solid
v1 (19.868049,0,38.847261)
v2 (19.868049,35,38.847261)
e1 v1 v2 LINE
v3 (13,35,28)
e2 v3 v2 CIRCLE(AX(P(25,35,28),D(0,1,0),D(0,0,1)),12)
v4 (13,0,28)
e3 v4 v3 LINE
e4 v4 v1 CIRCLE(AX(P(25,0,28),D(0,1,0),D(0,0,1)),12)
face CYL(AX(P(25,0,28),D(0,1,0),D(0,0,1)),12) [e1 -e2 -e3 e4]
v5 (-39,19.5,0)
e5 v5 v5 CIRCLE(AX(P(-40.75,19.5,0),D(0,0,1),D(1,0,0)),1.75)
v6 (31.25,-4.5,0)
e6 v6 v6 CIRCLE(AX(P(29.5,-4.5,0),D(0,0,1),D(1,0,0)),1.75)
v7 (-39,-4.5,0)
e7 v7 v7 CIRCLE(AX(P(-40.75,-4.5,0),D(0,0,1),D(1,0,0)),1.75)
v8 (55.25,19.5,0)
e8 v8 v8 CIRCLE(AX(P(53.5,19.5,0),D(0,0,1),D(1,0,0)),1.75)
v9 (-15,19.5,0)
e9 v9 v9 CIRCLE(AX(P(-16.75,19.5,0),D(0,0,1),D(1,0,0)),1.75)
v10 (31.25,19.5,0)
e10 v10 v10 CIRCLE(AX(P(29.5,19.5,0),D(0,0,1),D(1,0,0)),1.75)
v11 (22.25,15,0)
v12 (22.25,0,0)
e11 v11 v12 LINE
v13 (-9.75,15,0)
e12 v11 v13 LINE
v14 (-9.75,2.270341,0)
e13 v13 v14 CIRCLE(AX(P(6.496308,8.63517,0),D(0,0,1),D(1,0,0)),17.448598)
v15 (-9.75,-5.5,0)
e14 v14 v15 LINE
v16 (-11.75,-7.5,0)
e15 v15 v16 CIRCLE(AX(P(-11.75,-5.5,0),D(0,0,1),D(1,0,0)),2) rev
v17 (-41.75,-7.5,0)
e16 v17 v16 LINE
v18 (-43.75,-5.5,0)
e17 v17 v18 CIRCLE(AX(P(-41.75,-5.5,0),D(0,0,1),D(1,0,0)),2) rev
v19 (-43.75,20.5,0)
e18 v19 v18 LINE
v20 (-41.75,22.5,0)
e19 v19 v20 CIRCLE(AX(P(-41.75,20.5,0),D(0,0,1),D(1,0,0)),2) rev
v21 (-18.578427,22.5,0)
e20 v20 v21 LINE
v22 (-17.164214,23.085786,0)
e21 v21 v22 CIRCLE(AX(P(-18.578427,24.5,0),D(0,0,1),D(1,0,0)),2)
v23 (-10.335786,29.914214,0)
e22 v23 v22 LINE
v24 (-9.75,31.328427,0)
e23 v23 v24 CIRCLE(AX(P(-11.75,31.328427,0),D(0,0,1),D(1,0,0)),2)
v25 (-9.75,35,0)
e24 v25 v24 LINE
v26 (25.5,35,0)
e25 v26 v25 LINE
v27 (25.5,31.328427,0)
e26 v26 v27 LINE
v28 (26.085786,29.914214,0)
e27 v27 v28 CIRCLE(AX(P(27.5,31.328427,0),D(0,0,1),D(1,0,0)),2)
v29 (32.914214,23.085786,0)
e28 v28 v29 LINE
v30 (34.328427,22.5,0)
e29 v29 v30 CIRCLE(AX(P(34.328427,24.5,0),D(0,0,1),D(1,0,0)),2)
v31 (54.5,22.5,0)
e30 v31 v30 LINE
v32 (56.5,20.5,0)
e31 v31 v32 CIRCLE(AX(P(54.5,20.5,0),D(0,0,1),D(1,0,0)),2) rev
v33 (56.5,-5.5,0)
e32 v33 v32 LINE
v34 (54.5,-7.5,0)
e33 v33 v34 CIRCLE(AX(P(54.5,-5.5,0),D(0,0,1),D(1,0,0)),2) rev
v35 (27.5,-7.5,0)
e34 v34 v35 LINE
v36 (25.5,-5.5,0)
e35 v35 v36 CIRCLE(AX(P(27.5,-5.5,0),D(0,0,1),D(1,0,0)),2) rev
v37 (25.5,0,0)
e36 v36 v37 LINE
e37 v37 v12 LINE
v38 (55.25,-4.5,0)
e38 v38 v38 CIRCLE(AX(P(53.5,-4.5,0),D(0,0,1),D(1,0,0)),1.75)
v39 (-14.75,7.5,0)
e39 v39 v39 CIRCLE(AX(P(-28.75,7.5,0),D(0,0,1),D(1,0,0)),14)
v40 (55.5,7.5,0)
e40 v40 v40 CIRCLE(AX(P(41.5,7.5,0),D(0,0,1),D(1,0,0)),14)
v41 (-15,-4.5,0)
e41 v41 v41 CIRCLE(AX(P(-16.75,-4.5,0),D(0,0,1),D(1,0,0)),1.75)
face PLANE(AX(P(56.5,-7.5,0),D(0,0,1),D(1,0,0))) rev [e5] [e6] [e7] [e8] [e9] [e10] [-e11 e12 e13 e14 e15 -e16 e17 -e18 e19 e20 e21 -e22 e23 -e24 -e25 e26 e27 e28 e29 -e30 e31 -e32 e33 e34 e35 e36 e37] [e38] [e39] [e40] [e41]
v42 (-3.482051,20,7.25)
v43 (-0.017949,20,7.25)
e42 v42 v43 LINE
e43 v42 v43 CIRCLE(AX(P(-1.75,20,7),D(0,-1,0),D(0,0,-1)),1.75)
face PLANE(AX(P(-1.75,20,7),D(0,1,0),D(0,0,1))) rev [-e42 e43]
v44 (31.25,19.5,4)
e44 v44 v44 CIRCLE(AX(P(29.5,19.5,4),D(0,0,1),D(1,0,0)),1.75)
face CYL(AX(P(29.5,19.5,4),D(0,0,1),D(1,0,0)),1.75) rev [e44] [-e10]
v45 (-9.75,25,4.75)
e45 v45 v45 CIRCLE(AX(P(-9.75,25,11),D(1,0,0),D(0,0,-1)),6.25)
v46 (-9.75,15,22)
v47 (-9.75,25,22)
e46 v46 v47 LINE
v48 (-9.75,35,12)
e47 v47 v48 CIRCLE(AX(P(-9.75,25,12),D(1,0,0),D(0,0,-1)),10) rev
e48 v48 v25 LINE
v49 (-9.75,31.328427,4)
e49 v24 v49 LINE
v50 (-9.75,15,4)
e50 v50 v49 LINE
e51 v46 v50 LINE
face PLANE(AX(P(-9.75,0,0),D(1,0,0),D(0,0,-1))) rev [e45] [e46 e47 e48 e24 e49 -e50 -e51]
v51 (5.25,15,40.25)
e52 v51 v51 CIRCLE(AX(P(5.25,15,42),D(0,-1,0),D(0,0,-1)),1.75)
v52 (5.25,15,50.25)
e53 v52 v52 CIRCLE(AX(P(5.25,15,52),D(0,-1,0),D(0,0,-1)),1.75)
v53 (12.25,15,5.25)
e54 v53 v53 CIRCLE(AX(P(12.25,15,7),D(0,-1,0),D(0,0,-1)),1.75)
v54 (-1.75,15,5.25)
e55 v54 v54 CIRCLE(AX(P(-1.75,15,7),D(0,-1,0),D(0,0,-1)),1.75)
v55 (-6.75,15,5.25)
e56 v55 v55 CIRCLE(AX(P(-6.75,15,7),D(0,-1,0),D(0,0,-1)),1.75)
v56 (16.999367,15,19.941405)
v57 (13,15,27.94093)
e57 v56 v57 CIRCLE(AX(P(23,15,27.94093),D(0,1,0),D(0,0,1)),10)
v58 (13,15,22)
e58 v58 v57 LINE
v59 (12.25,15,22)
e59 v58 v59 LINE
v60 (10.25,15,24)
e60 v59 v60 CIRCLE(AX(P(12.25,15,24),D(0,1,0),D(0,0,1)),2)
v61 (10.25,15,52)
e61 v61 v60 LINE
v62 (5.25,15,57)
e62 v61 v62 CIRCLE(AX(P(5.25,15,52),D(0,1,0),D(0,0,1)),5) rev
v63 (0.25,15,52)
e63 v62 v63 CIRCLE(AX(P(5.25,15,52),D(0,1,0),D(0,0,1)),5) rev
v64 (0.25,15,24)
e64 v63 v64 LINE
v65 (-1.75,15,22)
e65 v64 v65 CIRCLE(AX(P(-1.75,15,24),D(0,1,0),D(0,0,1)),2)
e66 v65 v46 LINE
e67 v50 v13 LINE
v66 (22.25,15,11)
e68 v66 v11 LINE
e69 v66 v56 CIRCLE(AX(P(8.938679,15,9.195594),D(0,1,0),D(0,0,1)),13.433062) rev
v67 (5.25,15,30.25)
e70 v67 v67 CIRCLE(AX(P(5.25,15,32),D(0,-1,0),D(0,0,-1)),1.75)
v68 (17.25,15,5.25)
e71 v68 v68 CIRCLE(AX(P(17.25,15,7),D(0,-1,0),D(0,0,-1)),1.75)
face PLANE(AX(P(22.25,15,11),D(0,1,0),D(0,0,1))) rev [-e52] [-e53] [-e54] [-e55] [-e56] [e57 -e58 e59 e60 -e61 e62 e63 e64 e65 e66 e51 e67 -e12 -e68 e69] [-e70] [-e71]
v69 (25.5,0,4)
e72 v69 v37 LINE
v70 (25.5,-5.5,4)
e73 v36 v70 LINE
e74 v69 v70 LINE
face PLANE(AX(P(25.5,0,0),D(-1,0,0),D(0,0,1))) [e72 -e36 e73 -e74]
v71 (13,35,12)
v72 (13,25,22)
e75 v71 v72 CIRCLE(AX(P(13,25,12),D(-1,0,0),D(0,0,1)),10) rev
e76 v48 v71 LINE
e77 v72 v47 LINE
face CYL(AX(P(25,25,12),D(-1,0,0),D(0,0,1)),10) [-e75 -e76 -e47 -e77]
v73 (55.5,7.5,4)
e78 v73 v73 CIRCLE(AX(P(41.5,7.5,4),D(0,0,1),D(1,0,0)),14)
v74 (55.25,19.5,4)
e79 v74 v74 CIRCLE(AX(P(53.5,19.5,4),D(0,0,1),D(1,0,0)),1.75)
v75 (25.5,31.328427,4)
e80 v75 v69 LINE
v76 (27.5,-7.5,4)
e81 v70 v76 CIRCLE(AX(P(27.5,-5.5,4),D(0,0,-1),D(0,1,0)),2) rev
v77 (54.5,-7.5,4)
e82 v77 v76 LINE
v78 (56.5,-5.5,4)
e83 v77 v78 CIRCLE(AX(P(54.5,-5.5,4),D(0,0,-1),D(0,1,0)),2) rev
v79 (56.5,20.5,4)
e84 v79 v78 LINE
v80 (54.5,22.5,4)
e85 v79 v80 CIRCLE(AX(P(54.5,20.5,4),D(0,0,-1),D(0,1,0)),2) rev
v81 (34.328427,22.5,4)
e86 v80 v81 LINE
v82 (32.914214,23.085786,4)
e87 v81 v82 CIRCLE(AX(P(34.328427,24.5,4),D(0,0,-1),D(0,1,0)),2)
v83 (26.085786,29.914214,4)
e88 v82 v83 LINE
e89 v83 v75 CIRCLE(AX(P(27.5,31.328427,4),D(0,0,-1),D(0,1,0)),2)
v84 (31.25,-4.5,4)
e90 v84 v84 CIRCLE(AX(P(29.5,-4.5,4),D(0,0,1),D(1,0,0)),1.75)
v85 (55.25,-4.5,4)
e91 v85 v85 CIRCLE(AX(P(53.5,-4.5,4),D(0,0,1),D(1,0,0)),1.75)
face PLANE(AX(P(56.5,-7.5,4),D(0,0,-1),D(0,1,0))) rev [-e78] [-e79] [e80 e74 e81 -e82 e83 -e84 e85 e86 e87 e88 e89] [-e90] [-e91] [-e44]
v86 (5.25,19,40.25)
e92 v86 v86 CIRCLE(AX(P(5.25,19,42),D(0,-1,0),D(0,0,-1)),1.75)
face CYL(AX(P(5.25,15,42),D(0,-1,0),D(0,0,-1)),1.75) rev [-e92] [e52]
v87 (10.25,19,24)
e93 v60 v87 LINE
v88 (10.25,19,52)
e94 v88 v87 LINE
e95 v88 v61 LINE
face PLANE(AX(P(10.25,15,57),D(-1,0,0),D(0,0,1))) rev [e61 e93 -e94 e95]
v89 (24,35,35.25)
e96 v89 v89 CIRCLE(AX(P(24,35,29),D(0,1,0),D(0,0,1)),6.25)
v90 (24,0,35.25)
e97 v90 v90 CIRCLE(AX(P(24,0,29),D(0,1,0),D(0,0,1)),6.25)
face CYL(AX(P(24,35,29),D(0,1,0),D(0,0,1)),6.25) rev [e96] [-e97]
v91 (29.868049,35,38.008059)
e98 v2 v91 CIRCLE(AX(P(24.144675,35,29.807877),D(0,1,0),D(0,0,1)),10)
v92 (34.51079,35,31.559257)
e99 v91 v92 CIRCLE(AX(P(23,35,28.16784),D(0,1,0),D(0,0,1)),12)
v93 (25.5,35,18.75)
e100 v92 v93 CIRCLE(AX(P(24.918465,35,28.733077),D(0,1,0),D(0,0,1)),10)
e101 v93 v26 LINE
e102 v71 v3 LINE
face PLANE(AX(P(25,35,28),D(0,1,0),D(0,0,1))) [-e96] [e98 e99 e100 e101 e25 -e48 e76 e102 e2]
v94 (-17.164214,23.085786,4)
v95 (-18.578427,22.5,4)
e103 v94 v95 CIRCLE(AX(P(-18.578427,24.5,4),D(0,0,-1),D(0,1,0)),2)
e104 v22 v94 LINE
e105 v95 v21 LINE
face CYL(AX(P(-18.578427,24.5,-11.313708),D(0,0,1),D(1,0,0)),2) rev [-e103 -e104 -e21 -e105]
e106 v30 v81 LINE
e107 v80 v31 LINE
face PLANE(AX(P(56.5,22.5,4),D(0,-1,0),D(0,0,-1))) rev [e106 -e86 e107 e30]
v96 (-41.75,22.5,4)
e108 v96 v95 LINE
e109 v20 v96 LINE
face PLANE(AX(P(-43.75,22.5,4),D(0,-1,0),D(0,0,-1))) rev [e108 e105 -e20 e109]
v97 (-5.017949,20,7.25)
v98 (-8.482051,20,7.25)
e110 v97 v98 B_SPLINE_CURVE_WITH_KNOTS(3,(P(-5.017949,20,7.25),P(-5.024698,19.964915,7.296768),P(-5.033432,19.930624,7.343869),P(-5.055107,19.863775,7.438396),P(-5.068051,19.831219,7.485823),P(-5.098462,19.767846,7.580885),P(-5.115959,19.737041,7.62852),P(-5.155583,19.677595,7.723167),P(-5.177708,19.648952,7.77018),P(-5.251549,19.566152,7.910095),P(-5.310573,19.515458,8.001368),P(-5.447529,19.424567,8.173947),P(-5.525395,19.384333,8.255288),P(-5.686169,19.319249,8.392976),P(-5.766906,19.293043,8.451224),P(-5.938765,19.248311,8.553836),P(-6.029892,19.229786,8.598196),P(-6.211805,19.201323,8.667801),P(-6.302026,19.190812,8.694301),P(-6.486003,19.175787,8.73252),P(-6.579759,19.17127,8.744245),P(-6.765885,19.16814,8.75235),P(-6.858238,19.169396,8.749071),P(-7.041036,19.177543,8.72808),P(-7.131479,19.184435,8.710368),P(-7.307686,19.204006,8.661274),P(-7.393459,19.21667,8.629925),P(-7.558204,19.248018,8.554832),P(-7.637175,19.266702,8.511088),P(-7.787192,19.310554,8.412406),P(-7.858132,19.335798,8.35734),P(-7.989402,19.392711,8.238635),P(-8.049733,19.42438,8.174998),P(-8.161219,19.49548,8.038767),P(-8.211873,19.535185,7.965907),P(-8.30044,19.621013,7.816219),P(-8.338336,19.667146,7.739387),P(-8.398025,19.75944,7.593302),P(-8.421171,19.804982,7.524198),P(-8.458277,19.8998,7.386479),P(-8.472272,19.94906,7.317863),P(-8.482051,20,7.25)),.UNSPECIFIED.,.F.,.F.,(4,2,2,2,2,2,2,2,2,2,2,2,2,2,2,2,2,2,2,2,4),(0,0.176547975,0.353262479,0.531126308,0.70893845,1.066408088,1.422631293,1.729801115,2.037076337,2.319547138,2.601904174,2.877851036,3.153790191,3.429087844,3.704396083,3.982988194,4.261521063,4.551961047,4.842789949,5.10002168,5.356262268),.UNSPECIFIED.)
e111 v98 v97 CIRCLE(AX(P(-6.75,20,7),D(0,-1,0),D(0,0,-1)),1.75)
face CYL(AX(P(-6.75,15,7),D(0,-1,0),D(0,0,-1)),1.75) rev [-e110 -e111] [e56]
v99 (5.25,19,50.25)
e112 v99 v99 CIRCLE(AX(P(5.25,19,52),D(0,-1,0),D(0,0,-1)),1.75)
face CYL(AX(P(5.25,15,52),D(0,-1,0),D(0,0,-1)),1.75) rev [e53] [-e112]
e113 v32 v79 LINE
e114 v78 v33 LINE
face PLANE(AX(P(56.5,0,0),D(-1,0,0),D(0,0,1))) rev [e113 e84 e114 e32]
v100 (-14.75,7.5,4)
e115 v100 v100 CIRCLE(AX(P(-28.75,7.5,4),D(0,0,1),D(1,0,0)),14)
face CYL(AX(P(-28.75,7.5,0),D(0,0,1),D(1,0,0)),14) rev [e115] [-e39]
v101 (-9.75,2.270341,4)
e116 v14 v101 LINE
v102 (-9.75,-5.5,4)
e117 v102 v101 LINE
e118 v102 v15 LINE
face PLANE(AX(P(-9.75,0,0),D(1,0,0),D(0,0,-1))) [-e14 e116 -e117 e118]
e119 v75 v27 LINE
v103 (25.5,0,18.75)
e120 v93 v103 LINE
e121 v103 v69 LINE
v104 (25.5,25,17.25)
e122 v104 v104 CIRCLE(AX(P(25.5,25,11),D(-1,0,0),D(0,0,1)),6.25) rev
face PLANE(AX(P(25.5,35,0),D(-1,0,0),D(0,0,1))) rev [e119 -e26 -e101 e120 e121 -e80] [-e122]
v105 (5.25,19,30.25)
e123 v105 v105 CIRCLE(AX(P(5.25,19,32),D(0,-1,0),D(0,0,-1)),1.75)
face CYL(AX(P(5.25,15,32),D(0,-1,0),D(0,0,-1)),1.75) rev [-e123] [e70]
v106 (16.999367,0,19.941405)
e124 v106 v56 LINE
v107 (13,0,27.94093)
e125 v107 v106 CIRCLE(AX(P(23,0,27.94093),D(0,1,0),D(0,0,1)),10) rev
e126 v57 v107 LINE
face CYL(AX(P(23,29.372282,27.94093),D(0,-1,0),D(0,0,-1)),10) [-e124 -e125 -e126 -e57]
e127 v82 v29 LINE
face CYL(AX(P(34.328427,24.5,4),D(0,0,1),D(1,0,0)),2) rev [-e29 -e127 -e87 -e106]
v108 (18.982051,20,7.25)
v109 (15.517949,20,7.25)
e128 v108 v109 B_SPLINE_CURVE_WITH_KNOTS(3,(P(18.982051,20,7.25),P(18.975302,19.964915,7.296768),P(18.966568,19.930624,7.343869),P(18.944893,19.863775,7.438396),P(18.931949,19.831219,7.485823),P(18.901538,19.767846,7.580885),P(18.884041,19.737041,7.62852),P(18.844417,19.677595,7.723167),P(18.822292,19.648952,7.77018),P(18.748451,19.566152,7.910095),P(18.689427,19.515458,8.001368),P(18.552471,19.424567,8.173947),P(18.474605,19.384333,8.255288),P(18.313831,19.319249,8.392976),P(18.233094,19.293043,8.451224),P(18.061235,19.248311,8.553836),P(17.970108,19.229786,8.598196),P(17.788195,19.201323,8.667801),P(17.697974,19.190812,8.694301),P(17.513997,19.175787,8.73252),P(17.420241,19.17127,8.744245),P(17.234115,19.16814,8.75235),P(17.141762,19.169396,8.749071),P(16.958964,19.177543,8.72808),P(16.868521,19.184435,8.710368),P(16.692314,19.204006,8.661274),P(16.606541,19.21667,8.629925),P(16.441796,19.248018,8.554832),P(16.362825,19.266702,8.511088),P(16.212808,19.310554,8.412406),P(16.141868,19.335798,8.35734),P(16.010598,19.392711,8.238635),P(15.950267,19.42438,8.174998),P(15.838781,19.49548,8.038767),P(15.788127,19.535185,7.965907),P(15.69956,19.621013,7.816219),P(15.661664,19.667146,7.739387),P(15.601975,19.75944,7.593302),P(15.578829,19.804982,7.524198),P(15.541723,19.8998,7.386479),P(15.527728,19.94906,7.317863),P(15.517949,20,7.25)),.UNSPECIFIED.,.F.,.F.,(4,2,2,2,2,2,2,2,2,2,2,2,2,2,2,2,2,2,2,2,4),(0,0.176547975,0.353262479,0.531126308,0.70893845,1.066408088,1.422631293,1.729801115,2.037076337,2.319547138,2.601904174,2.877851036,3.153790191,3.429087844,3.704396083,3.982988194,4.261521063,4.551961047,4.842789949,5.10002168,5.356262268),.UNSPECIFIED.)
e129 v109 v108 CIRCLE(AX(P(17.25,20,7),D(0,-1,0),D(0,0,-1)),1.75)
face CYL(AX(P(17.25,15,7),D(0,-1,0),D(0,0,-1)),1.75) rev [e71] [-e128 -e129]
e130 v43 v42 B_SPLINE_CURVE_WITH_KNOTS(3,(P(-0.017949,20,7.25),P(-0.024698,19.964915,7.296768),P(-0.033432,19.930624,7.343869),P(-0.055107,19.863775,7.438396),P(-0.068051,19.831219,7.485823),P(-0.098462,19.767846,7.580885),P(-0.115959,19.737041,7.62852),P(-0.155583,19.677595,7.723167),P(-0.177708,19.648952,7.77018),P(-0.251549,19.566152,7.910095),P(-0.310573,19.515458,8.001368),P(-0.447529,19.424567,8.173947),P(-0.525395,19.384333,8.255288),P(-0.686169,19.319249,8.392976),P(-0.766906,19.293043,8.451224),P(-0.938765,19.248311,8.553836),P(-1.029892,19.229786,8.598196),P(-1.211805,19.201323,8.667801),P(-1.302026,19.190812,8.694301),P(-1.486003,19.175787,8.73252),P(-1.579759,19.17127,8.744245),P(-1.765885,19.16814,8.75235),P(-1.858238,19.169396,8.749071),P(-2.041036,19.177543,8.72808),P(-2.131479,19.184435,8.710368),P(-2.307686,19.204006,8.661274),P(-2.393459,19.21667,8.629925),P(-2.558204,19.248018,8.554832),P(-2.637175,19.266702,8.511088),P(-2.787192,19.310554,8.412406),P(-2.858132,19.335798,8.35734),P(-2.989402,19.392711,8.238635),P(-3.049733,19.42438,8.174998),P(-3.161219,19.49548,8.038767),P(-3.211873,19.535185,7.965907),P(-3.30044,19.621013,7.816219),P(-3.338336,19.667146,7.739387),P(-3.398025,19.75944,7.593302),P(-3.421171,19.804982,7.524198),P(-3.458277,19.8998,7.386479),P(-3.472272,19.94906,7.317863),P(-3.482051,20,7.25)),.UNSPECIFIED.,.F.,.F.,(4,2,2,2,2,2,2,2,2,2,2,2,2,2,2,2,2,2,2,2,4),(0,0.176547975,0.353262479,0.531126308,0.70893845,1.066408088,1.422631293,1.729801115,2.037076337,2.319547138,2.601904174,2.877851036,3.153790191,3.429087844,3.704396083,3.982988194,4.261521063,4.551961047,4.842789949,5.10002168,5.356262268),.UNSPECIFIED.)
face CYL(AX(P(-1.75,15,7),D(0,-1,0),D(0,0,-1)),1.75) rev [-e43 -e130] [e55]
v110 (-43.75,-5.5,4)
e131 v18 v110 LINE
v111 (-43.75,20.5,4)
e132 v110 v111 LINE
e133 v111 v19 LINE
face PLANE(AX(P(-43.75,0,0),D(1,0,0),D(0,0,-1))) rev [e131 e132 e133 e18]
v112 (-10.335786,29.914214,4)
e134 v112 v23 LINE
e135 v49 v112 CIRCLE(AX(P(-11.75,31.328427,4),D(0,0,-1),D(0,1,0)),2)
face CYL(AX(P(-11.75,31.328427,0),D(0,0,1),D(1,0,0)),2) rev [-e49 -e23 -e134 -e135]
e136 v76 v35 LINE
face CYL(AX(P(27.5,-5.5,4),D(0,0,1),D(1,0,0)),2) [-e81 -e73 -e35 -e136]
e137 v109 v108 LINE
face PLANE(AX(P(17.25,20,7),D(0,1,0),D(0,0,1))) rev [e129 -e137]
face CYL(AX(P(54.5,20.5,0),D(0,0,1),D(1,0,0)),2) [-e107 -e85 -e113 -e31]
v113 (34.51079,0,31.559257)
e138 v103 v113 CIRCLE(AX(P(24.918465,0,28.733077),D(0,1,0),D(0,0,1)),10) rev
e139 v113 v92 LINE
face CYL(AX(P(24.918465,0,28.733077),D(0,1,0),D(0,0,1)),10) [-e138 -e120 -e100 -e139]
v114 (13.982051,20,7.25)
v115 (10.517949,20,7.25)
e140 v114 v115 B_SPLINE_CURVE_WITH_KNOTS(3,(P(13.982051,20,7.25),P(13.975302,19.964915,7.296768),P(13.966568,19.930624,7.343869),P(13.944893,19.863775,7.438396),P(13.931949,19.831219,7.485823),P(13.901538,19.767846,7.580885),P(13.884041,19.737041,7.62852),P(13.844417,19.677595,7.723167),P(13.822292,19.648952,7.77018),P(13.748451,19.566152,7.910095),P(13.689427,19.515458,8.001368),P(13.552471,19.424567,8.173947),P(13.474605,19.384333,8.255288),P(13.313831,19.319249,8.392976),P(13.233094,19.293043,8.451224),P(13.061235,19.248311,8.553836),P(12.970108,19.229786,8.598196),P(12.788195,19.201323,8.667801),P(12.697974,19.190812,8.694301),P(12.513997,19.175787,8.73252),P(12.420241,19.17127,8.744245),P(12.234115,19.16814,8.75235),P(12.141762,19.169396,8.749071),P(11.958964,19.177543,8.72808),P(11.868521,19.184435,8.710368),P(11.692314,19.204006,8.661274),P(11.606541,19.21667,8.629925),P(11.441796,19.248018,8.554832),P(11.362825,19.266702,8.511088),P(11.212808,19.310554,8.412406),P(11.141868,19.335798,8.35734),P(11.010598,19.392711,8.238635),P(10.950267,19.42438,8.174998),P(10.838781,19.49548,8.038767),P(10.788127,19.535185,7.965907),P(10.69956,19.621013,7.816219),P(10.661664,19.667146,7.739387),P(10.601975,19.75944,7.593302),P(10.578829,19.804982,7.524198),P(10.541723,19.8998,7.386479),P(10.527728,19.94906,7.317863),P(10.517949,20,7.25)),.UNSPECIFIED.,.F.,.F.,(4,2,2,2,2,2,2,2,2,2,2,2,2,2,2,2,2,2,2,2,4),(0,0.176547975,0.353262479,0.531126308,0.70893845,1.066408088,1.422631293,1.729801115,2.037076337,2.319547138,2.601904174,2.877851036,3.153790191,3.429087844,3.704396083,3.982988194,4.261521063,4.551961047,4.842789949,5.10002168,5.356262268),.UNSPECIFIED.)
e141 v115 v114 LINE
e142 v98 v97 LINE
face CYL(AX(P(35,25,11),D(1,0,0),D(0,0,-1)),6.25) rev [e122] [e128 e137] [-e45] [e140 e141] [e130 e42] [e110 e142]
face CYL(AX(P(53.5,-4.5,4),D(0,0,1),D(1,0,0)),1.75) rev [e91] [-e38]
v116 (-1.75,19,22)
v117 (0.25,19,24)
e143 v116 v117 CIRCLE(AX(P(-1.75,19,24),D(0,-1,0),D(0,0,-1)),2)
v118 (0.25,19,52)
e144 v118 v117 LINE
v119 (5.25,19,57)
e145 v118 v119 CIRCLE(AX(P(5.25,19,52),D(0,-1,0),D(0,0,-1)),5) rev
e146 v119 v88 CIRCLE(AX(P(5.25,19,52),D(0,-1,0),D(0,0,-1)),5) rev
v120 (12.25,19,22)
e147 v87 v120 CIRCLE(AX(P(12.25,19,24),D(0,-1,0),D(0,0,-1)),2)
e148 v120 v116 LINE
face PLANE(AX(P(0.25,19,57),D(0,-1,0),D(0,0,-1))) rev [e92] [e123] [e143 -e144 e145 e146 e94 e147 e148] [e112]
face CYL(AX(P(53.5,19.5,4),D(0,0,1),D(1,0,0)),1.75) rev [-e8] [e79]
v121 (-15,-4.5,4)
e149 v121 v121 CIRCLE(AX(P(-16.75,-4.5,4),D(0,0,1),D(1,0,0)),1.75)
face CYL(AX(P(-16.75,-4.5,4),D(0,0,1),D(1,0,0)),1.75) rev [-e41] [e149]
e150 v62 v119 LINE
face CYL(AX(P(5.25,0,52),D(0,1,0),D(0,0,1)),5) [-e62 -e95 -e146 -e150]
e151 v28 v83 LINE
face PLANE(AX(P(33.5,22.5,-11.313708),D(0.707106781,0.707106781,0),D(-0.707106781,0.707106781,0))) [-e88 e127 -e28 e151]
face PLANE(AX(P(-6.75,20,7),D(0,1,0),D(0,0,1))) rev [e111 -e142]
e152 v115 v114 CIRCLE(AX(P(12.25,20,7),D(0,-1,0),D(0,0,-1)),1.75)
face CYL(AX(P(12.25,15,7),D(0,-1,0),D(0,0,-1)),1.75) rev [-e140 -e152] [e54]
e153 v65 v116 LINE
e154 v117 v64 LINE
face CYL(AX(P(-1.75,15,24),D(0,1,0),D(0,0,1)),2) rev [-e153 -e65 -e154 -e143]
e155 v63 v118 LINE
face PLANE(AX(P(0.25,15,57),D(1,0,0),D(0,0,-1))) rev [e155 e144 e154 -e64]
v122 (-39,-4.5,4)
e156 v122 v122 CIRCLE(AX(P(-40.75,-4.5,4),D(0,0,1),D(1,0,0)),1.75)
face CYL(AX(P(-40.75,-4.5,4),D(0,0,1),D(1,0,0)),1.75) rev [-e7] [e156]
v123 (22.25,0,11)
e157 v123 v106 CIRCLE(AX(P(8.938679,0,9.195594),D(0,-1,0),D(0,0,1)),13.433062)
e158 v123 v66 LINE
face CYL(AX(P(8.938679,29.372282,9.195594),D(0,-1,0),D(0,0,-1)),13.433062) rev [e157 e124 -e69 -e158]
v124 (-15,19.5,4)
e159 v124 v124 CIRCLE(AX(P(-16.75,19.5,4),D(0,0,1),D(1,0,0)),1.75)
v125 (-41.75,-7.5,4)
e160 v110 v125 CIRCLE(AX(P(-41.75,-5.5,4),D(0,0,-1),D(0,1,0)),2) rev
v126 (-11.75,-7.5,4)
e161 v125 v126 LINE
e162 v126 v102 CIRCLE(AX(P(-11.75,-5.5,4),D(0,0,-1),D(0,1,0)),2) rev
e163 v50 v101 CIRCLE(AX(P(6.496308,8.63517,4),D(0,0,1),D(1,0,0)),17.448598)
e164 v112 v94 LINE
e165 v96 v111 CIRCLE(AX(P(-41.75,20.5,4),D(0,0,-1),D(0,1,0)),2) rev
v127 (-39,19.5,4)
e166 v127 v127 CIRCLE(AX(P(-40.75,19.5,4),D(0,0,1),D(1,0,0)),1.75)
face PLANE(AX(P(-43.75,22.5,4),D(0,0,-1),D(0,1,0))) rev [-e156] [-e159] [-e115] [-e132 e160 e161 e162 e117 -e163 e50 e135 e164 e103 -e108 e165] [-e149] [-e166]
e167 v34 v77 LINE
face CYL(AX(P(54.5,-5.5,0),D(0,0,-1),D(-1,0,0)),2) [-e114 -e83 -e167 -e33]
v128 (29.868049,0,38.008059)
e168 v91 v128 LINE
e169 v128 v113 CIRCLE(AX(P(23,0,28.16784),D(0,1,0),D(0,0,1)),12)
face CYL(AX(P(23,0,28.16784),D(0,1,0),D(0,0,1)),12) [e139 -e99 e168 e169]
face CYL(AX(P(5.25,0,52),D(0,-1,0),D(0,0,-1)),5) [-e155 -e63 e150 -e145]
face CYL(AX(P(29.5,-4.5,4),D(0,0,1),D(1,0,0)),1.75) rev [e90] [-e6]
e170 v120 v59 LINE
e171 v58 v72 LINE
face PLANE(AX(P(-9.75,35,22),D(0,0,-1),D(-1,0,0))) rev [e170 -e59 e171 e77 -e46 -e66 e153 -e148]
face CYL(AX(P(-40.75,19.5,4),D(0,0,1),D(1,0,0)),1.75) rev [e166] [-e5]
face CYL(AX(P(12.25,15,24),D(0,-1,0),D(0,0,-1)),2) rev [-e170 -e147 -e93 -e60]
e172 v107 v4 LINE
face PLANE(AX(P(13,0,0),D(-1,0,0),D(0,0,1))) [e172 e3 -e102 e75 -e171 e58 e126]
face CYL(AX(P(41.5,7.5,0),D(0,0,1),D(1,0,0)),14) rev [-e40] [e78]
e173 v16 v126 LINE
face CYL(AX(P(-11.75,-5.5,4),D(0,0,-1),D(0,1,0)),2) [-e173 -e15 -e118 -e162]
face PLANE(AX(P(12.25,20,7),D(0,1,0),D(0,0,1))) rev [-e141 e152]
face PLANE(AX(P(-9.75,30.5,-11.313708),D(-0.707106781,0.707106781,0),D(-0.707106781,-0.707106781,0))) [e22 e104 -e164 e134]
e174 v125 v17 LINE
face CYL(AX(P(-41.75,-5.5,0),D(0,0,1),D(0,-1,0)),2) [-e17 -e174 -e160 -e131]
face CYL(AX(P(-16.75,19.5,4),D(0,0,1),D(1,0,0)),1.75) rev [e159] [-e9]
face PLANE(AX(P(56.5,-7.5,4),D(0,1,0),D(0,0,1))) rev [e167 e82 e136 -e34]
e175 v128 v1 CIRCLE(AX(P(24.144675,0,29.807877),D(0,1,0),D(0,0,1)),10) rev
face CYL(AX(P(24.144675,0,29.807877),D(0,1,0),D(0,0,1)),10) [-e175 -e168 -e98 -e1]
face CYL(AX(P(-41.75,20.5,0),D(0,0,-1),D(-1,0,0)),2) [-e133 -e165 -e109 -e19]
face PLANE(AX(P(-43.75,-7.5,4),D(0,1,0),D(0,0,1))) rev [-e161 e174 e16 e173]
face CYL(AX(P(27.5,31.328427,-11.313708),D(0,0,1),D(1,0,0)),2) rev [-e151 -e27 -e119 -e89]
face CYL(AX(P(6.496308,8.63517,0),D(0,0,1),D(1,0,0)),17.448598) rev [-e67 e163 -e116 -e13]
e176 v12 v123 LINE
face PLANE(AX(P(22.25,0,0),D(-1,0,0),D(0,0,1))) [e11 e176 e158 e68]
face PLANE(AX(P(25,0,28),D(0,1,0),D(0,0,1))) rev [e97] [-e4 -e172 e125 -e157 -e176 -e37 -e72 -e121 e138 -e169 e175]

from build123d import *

# Parameters (mm, degrees)
EXTRUDE_1_DEPTH                  = 35
SKETCH_2_W                       = 22
SKETCH_2_H                       = 35
EXTRUDE_2_DEPTH                  = 22.75
SKETCH_3_W                       = 11
SKETCH_3_H                       = 15
CUT_EXTRUDE_1_DEPTH              = 32
HOLE_WIZARD_12_5_12_5_1_D        = 12.5
HOLE_WIZARD_12_5_12_5_2_D        = 12.5
HOLE_WIZARD_3_5_3_5_1_D          = 3.5
HOLE_WIZARD_3_5_3_5_1_DEPTH      = 5
SKETCH_10_W                      = 9.5
SKETCH_10_H                      = 18.75
CUT_EXTRUDE_2_DEPTH              = 64.639610362
SKETCH_11_W                      = 22.75
SKETCH_11_H                      = 11
CUT_EXTRUDE_3_DEPTH              = 15
FILLET_2_R                       = 10
SKETCH_13_W                      = 4
SKETCH_13_H                      = 30
EXTRUDE_3_DEPTH                  = 31
SKETCH_16_W                      = 1.75
SKETCH_16_H                      = 4
HOLE_WIZARD_3_5_3_5_2_AT_2_COUNT = 2
HOLE_WIZARD_3_5_3_5_2_AT_2_PITCH = 24
HOLE_WIZARD_3_5_3_5_2_AT_3_COUNT = 2
HOLE_WIZARD_3_5_3_5_2_AT_3_PITCH = 33.941125497
HOLE_WIZARD_3_5_3_5_2_AT_4_COUNT = 2
HOLE_WIZARD_3_5_3_5_2_AT_4_PITCH = 24
SKETCH_17_R                      = 14
CUT_EXTRUDE_4_DEPTH              = 76.494728698
SKETCH_19_W                      = 4
SKETCH_19_H                      = 30
EXTRUDE_5_DEPTH                  = 34
SKETCH_20_R                      = 14
CUT_EXTRUDE_5_DEPTH              = 76.494728698
SKETCH_22_W                      = 1.75
SKETCH_22_H                      = 4
HOLE_WIZARD_3_5_3_5_3_AT_2_COUNT = 2
HOLE_WIZARD_3_5_3_5_3_AT_2_PITCH = 24
HOLE_WIZARD_3_5_3_5_3_AT_3_COUNT = 2
HOLE_WIZARD_3_5_3_5_3_AT_3_PITCH = 33.941125497
HOLE_WIZARD_3_5_3_5_3_AT_4_COUNT = 2
HOLE_WIZARD_3_5_3_5_3_AT_4_PITCH = 24
EXTRUDE_6_DEPTH                  = 4
EXTRUDE_7_DEPTH                  = 4
SKETCH_26_W                      = 10
SKETCH_26_H                      = 4
EXTRUDE_8_DEPTH                  = 35
HOLE_WIZARD_3_5_3_5_4_D          = 3.5
FILLET_7_R                       = 2
FILLET_9_R                       = 5
FILLET_10_R                      = 10
FILLET_12_R                      = 10
FILLET_13_R                      = 2
FILLET_14_R                      = 2
CUT_EXTRUDE_6_DEPTH              = 86.007352664
CUT_EXTRUDE_7_DEPTH              = 15
FILLET_15_R                      = 10


# Some blends are built 0.0001 mm under size
with BuildPart() as part:
    # Эскиз1 → Бобышка-Вытянуть1 (new body)
    with BuildSketch(Plane(origin=(0, 35, 0), x_dir=(1, 0, 0), z_dir=(0, 1, 0))):
        with BuildLine():
            Line((35, 0), (13, 0))
            Line((13, 0), (13, -28))
            ThreePointArc((13, -28), (16.514718626, -36.485281374), (25, -40))
            ThreePointArc((25, -40), (32.16515139, -35.913807126), (35, -28.167840434))
            Line((35, -28.167840434), (35, 0))
        make_face()
    extrude(amount=-EXTRUDE_1_DEPTH)

    # Эскиз2 → Бобышка-Вытянуть2 (add)
    with BuildSketch(Plane.ZY.offset(-13)):
        with Locations((11, 17.5)):
            Rectangle(SKETCH_2_W, SKETCH_2_H)
    extrude(amount=EXTRUDE_2_DEPTH)

    # Эскиз3 → Вырез-Вытянуть1 (cut)
    with BuildSketch(Plane.ZY.offset(9.75)):
        with Locations((5.5, 7.5)):
            Rectangle(SKETCH_3_W, SKETCH_3_H)
    extrude(amount=-CUT_EXTRUDE_1_DEPTH, mode=Mode.SUBTRACT)

    # Диаметр отверстия Ø12.5 (12.5)1 (through all)
    with Locations(Plane(origin=(0, 35, 0), x_dir=(1, 0, 0), z_dir=(0, 1, 0))):
        with Locations((24, -29)):
            Hole(HOLE_WIZARD_12_5_12_5_1_D / 2)

    # Диаметр отверстия Ø12.5 (12.5)2 (through all)
    with Locations(Plane(origin=(35, 0, 0), x_dir=(0, 0, -1), z_dir=(1, 0, 0))):
        with Locations((-11, 25)):
            Hole(HOLE_WIZARD_12_5_12_5_2_D / 2)

    # Диаметр отверстия Ø3.5 (3.5)1
    with Locations(Plane(origin=(0, 15, 0), x_dir=(-1, 0, 0), z_dir=(0, -1, 0))):
        with Locations((-17.25, -7), (6.75, -7), (-12.25, -7), (1.75, -7)):
            Hole(HOLE_WIZARD_3_5_3_5_1_D / 2, depth=HOLE_WIZARD_3_5_3_5_1_DEPTH)

    # Эскиз10 → Вырез-Вытянуть2 (cut, through all)
    with BuildSketch(Plane.XZ):
        with Locations((30.25, 9.375)):
            Rectangle(SKETCH_10_W, SKETCH_10_H)
    extrude(amount=-CUT_EXTRUDE_2_DEPTH, mode=Mode.SUBTRACT)

    # Эскиз11 → Вырез-Вытянуть3 (cut)
    with BuildSketch(Plane.XZ):
        with Locations((1.625, 16.5)):
            Rectangle(SKETCH_11_W, SKETCH_11_H)
    extrude(amount=-CUT_EXTRUDE_3_DEPTH, mode=Mode.SUBTRACT)

    # Скругление2
    fillet_2_edges = [part.edges().sort_by_distance(p)[0] for p in [
        (25, 17.5, 40),
    ]]
    fillet(fillet_2_edges, radius=FILLET_2_R)

    # Эскиз19 → Бобышка-Вытянуть5 (add)
    with BuildSketch(Plane.ZY.offset(9.75)):
        with Locations((2, 7.5)):
            Rectangle(SKETCH_19_W, SKETCH_19_H)
    extrude(amount=EXTRUDE_5_DEPTH)

    # Эскиз20 → Вырез-Вытянуть5 (cut, through all)
    with BuildSketch(Plane.XY.offset(4)):
        with Locations((-28.75, 7.5)):
            Circle(SKETCH_20_R)
    extrude(amount=-CUT_EXTRUDE_5_DEPTH, mode=Mode.SUBTRACT)

    # Эскиз22 → Диаметр отверстия Ø3.5 (3.5)3 (revolve, cut)
    with BuildSketch(Plane(origin=(-16.75, 19.5, 4), x_dir=(0, -1, 0), z_dir=(1, 0, 0))):
        with Locations((0.875, 2)):
            Rectangle(SKETCH_22_W, SKETCH_22_H)
    hole_wizard_3_5_3_5_3 = revolve(axis=Axis((-16.75, 19.5, 10.35), (0, 0, -1)), mode=Mode.SUBTRACT)

    # Диаметр отверстия Ø3.5 (3.5)3 at 2: Диаметр отверстия Ø3.5 (3.5)3 ×2
    with Locations(*[(0, -i * HOLE_WIZARD_3_5_3_5_3_AT_2_PITCH, 0) for i in range(1, HOLE_WIZARD_3_5_3_5_3_AT_2_COUNT)]):
        add(hole_wizard_3_5_3_5_3, mode=Mode.SUBTRACT)

    # Диаметр отверстия Ø3.5 (3.5)3 at 3: Диаметр отверстия Ø3.5 (3.5)3 ×2
    with Locations(*[Vector(-0.7071067811865475, -0.7071067811865476, 0) * (i * HOLE_WIZARD_3_5_3_5_3_AT_3_PITCH) for i in range(1, HOLE_WIZARD_3_5_3_5_3_AT_3_COUNT)]):
        add(hole_wizard_3_5_3_5_3, mode=Mode.SUBTRACT)

    # Диаметр отверстия Ø3.5 (3.5)3 at 4: Диаметр отверстия Ø3.5 (3.5)3 ×2
    with Locations(*[(-i * HOLE_WIZARD_3_5_3_5_3_AT_4_PITCH, 0, 0) for i in range(1, HOLE_WIZARD_3_5_3_5_3_AT_4_COUNT)]):
        add(hole_wizard_3_5_3_5_3, mode=Mode.SUBTRACT)

    # Эскиз24 → Бобышка-Вытянуть6 (add)
    with BuildSketch(Plane.XY.offset(4)):
        Polygon((-9.75, 30.5), (-17.75, 22.5), (-9.75, 22.5), align=None)
    extrude(amount=-EXTRUDE_6_DEPTH)



with BuildPart() as body_2:
    # Эскиз13 → Бобышка-Вытянуть3 (new body)
    with BuildSketch(Plane(origin=(25.5, 0, 0), x_dir=(0, 0, -1), z_dir=(1, 0, 0))):
        with Locations((-2, 7.5)):
            Rectangle(SKETCH_13_W, SKETCH_13_H)
    extrude(amount=EXTRUDE_3_DEPTH)

    # Эскиз16 → Диаметр отверстия Ø3.5 (3.5)2 (revolve, cut)
    with BuildSketch(Plane(origin=(29.5, -4.5, 4), x_dir=(0, -1, 0), z_dir=(1, 0, 0))):
        with Locations((0.875, 2)):
            Rectangle(SKETCH_16_W, SKETCH_16_H)
    hole_wizard_3_5_3_5_2 = revolve(axis=Axis((29.5, -4.5, 10.35), (0, 0, -1)), mode=Mode.SUBTRACT)

    # Диаметр отверстия Ø3.5 (3.5)2 at 2: Диаметр отверстия Ø3.5 (3.5)2 ×2
    with Locations(*[(0, i * HOLE_WIZARD_3_5_3_5_2_AT_2_PITCH, 0) for i in range(1, HOLE_WIZARD_3_5_3_5_2_AT_2_COUNT)]):
        add(hole_wizard_3_5_3_5_2, mode=Mode.SUBTRACT)

    # Диаметр отверстия Ø3.5 (3.5)2 at 3: Диаметр отверстия Ø3.5 (3.5)2 ×2
    with Locations(*[Vector(0.7071067811865475, 0.7071067811865476, 0) * (i * HOLE_WIZARD_3_5_3_5_2_AT_3_PITCH) for i in range(1, HOLE_WIZARD_3_5_3_5_2_AT_3_COUNT)]):
        add(hole_wizard_3_5_3_5_2, mode=Mode.SUBTRACT)

    # Диаметр отверстия Ø3.5 (3.5)2 at 4: Диаметр отверстия Ø3.5 (3.5)2 ×2
    with Locations(*[(i * HOLE_WIZARD_3_5_3_5_2_AT_4_PITCH, 0, 0) for i in range(1, HOLE_WIZARD_3_5_3_5_2_AT_4_COUNT)]):
        add(hole_wizard_3_5_3_5_2, mode=Mode.SUBTRACT)

    # Эскиз17 → Вырез-Вытянуть4 (cut, through all)
    with BuildSketch(Plane.XY.offset(4)):
        with Locations((41.5, 7.5)):
            Circle(SKETCH_17_R)
    extrude(amount=-CUT_EXTRUDE_4_DEPTH, mode=Mode.SUBTRACT)


with BuildPart() as part_1:
    add(part.part)

    add(body_2.part)  # Бобышка-Вытянуть7 merges body 2
    # Эскиз25 → Бобышка-Вытянуть7 (add)
    with BuildSketch(Plane.XY.offset(4)):
        Polygon((33.5, 22.5), (25.5, 30.5), (25.5, 22.5), align=None)
    extrude(amount=-EXTRUDE_7_DEPTH)

    # Эскиз26 → Бобышка-Вытянуть8 (add)
    with BuildSketch(Plane.XY.offset(22)):
        with Locations((5.25, 17)):
            Rectangle(SKETCH_26_W, SKETCH_26_H)
    extrude(amount=EXTRUDE_8_DEPTH)

    # Диаметр отверстия Ø3.5 (3.5)4 (through all)
    with Locations(Plane(origin=(0, 15, 0), x_dir=(-1, 0, 0), z_dir=(0, -1, 0))):
        with Locations((-5.25, -52), (-5.25, -42), (-5.25, -32)):
            Hole(HOLE_WIZARD_3_5_3_5_4_D / 2)

    # Скругление7
    fillet_7_edges = [part_1.edges().sort_by_distance(p)[0] for p in [
        (0.25, 17, 22),
        (10.25, 17, 22),
    ]]
    fillet(fillet_7_edges, radius=FILLET_7_R)

    # Скругление9
    fillet_9_edges = [part_1.edges().sort_by_distance(p)[0] for p in [
        (0.25, 17, 57),
        (10.25, 17, 57),
    ]]
    fillet(fillet_9_edges, radius=FILLET_9_R - 0.0001)  # a hair under: the kernel refuses the full size

    # Скругление10
    # the kernel refuses this fillet: 10 mm, written as the material it takes off along each edge
    with BuildSketch(Plane(origin=(35, -32.046488893, 18.75), x_dir=(-0.03816406367220006, 0, 0.999271486756239), z_dir=(0, 1, 0))) as fillet_10_piece_1:
        with BuildLine():
            CenterArc((10.360556073, -9.693195649), FILLET_10_R, 75.770650452, 103.082689776)
            Line((0.362558605, -9.493079124), (-0.637241142, -9.473067472))
            ThreePointArc((-0.637241142, -9.473067472), (-0.817992184, -4.784703626), (-0.999271487, -0.038164064))
            Line((-0.999271487, -0.038164064), (-0.038164064, 0.999271487))
            ThreePointArc((-0.038164064, 0.999271487), (9.372815349, 1.358694549), (13.064399506, 0.969319565))
            Line((13.064399506, 0.969319565), (12.818595557, 0))
        make_face()
    extrude(amount=99.092977786, mode=Mode.SUBTRACT)

    # Скругление12
    fillet_12_edges = [part_1.edges().sort_by_distance(p)[0] for p in [
        (1.625, 35, 22),
    ]]
    fillet(fillet_12_edges, radius=FILLET_12_R)

    # Скругление13
    fillet_13_edges = [part_1.edges().sort_by_distance(p)[0] for p in [
        (-9.75, 30.5, 2),
        (-9.75, -7.5, 2),
        (-43.75, 22.5, 2),
        (-43.75, -7.5, 2),
        (-17.75, 22.5, 2),
    ]]
    fillet(fillet_13_edges, radius=FILLET_13_R)

    # Скругление14
    fillet_14_edges = [part_1.edges().sort_by_distance(p)[0] for p in [
        (56.5, 22.5, 2),
        (25.5, 30.5, 2),
        (33.5, 22.5, 2),
        (25.5, -7.5, 2),
        (56.5, -7.5, 2),
    ]]
    fillet(fillet_14_edges, radius=FILLET_14_R)

    # Эскиз32 → Вырез-Вытянуть6 (cut, through all)
    with BuildSketch(Plane.XY.offset(4)):
        with BuildLine():
            Line((-9.75, 2.270340952), (-9.75, 15))
            ThreePointArc((-9.75, 15), (-10.952290213, 8.635170476), (-9.75, 2.270340952))
        make_face()
    extrude(amount=-CUT_EXTRUDE_6_DEPTH, mode=Mode.SUBTRACT)

    # Эскиз33 → Вырез-Вытянуть7 (cut)
    with BuildSketch(Plane.XZ):
        with BuildLine():
            Line((13, 22), (13, 11))
            Line((13, 11), (22.25, 11))
            ThreePointArc((22.25, 11), (19.219835157, 17.841111382), (13, 22))
        make_face()
    extrude(amount=-CUT_EXTRUDE_7_DEPTH, mode=Mode.SUBTRACT)

    # Скругление15
    fillet_15_edges = [part_1.edges().sort_by_distance(p)[0] for p in [
        (13, 7.5, 22),
    ]]
    fillet(fillet_15_edges, radius=FILLET_15_R)


solid = part_1.part
